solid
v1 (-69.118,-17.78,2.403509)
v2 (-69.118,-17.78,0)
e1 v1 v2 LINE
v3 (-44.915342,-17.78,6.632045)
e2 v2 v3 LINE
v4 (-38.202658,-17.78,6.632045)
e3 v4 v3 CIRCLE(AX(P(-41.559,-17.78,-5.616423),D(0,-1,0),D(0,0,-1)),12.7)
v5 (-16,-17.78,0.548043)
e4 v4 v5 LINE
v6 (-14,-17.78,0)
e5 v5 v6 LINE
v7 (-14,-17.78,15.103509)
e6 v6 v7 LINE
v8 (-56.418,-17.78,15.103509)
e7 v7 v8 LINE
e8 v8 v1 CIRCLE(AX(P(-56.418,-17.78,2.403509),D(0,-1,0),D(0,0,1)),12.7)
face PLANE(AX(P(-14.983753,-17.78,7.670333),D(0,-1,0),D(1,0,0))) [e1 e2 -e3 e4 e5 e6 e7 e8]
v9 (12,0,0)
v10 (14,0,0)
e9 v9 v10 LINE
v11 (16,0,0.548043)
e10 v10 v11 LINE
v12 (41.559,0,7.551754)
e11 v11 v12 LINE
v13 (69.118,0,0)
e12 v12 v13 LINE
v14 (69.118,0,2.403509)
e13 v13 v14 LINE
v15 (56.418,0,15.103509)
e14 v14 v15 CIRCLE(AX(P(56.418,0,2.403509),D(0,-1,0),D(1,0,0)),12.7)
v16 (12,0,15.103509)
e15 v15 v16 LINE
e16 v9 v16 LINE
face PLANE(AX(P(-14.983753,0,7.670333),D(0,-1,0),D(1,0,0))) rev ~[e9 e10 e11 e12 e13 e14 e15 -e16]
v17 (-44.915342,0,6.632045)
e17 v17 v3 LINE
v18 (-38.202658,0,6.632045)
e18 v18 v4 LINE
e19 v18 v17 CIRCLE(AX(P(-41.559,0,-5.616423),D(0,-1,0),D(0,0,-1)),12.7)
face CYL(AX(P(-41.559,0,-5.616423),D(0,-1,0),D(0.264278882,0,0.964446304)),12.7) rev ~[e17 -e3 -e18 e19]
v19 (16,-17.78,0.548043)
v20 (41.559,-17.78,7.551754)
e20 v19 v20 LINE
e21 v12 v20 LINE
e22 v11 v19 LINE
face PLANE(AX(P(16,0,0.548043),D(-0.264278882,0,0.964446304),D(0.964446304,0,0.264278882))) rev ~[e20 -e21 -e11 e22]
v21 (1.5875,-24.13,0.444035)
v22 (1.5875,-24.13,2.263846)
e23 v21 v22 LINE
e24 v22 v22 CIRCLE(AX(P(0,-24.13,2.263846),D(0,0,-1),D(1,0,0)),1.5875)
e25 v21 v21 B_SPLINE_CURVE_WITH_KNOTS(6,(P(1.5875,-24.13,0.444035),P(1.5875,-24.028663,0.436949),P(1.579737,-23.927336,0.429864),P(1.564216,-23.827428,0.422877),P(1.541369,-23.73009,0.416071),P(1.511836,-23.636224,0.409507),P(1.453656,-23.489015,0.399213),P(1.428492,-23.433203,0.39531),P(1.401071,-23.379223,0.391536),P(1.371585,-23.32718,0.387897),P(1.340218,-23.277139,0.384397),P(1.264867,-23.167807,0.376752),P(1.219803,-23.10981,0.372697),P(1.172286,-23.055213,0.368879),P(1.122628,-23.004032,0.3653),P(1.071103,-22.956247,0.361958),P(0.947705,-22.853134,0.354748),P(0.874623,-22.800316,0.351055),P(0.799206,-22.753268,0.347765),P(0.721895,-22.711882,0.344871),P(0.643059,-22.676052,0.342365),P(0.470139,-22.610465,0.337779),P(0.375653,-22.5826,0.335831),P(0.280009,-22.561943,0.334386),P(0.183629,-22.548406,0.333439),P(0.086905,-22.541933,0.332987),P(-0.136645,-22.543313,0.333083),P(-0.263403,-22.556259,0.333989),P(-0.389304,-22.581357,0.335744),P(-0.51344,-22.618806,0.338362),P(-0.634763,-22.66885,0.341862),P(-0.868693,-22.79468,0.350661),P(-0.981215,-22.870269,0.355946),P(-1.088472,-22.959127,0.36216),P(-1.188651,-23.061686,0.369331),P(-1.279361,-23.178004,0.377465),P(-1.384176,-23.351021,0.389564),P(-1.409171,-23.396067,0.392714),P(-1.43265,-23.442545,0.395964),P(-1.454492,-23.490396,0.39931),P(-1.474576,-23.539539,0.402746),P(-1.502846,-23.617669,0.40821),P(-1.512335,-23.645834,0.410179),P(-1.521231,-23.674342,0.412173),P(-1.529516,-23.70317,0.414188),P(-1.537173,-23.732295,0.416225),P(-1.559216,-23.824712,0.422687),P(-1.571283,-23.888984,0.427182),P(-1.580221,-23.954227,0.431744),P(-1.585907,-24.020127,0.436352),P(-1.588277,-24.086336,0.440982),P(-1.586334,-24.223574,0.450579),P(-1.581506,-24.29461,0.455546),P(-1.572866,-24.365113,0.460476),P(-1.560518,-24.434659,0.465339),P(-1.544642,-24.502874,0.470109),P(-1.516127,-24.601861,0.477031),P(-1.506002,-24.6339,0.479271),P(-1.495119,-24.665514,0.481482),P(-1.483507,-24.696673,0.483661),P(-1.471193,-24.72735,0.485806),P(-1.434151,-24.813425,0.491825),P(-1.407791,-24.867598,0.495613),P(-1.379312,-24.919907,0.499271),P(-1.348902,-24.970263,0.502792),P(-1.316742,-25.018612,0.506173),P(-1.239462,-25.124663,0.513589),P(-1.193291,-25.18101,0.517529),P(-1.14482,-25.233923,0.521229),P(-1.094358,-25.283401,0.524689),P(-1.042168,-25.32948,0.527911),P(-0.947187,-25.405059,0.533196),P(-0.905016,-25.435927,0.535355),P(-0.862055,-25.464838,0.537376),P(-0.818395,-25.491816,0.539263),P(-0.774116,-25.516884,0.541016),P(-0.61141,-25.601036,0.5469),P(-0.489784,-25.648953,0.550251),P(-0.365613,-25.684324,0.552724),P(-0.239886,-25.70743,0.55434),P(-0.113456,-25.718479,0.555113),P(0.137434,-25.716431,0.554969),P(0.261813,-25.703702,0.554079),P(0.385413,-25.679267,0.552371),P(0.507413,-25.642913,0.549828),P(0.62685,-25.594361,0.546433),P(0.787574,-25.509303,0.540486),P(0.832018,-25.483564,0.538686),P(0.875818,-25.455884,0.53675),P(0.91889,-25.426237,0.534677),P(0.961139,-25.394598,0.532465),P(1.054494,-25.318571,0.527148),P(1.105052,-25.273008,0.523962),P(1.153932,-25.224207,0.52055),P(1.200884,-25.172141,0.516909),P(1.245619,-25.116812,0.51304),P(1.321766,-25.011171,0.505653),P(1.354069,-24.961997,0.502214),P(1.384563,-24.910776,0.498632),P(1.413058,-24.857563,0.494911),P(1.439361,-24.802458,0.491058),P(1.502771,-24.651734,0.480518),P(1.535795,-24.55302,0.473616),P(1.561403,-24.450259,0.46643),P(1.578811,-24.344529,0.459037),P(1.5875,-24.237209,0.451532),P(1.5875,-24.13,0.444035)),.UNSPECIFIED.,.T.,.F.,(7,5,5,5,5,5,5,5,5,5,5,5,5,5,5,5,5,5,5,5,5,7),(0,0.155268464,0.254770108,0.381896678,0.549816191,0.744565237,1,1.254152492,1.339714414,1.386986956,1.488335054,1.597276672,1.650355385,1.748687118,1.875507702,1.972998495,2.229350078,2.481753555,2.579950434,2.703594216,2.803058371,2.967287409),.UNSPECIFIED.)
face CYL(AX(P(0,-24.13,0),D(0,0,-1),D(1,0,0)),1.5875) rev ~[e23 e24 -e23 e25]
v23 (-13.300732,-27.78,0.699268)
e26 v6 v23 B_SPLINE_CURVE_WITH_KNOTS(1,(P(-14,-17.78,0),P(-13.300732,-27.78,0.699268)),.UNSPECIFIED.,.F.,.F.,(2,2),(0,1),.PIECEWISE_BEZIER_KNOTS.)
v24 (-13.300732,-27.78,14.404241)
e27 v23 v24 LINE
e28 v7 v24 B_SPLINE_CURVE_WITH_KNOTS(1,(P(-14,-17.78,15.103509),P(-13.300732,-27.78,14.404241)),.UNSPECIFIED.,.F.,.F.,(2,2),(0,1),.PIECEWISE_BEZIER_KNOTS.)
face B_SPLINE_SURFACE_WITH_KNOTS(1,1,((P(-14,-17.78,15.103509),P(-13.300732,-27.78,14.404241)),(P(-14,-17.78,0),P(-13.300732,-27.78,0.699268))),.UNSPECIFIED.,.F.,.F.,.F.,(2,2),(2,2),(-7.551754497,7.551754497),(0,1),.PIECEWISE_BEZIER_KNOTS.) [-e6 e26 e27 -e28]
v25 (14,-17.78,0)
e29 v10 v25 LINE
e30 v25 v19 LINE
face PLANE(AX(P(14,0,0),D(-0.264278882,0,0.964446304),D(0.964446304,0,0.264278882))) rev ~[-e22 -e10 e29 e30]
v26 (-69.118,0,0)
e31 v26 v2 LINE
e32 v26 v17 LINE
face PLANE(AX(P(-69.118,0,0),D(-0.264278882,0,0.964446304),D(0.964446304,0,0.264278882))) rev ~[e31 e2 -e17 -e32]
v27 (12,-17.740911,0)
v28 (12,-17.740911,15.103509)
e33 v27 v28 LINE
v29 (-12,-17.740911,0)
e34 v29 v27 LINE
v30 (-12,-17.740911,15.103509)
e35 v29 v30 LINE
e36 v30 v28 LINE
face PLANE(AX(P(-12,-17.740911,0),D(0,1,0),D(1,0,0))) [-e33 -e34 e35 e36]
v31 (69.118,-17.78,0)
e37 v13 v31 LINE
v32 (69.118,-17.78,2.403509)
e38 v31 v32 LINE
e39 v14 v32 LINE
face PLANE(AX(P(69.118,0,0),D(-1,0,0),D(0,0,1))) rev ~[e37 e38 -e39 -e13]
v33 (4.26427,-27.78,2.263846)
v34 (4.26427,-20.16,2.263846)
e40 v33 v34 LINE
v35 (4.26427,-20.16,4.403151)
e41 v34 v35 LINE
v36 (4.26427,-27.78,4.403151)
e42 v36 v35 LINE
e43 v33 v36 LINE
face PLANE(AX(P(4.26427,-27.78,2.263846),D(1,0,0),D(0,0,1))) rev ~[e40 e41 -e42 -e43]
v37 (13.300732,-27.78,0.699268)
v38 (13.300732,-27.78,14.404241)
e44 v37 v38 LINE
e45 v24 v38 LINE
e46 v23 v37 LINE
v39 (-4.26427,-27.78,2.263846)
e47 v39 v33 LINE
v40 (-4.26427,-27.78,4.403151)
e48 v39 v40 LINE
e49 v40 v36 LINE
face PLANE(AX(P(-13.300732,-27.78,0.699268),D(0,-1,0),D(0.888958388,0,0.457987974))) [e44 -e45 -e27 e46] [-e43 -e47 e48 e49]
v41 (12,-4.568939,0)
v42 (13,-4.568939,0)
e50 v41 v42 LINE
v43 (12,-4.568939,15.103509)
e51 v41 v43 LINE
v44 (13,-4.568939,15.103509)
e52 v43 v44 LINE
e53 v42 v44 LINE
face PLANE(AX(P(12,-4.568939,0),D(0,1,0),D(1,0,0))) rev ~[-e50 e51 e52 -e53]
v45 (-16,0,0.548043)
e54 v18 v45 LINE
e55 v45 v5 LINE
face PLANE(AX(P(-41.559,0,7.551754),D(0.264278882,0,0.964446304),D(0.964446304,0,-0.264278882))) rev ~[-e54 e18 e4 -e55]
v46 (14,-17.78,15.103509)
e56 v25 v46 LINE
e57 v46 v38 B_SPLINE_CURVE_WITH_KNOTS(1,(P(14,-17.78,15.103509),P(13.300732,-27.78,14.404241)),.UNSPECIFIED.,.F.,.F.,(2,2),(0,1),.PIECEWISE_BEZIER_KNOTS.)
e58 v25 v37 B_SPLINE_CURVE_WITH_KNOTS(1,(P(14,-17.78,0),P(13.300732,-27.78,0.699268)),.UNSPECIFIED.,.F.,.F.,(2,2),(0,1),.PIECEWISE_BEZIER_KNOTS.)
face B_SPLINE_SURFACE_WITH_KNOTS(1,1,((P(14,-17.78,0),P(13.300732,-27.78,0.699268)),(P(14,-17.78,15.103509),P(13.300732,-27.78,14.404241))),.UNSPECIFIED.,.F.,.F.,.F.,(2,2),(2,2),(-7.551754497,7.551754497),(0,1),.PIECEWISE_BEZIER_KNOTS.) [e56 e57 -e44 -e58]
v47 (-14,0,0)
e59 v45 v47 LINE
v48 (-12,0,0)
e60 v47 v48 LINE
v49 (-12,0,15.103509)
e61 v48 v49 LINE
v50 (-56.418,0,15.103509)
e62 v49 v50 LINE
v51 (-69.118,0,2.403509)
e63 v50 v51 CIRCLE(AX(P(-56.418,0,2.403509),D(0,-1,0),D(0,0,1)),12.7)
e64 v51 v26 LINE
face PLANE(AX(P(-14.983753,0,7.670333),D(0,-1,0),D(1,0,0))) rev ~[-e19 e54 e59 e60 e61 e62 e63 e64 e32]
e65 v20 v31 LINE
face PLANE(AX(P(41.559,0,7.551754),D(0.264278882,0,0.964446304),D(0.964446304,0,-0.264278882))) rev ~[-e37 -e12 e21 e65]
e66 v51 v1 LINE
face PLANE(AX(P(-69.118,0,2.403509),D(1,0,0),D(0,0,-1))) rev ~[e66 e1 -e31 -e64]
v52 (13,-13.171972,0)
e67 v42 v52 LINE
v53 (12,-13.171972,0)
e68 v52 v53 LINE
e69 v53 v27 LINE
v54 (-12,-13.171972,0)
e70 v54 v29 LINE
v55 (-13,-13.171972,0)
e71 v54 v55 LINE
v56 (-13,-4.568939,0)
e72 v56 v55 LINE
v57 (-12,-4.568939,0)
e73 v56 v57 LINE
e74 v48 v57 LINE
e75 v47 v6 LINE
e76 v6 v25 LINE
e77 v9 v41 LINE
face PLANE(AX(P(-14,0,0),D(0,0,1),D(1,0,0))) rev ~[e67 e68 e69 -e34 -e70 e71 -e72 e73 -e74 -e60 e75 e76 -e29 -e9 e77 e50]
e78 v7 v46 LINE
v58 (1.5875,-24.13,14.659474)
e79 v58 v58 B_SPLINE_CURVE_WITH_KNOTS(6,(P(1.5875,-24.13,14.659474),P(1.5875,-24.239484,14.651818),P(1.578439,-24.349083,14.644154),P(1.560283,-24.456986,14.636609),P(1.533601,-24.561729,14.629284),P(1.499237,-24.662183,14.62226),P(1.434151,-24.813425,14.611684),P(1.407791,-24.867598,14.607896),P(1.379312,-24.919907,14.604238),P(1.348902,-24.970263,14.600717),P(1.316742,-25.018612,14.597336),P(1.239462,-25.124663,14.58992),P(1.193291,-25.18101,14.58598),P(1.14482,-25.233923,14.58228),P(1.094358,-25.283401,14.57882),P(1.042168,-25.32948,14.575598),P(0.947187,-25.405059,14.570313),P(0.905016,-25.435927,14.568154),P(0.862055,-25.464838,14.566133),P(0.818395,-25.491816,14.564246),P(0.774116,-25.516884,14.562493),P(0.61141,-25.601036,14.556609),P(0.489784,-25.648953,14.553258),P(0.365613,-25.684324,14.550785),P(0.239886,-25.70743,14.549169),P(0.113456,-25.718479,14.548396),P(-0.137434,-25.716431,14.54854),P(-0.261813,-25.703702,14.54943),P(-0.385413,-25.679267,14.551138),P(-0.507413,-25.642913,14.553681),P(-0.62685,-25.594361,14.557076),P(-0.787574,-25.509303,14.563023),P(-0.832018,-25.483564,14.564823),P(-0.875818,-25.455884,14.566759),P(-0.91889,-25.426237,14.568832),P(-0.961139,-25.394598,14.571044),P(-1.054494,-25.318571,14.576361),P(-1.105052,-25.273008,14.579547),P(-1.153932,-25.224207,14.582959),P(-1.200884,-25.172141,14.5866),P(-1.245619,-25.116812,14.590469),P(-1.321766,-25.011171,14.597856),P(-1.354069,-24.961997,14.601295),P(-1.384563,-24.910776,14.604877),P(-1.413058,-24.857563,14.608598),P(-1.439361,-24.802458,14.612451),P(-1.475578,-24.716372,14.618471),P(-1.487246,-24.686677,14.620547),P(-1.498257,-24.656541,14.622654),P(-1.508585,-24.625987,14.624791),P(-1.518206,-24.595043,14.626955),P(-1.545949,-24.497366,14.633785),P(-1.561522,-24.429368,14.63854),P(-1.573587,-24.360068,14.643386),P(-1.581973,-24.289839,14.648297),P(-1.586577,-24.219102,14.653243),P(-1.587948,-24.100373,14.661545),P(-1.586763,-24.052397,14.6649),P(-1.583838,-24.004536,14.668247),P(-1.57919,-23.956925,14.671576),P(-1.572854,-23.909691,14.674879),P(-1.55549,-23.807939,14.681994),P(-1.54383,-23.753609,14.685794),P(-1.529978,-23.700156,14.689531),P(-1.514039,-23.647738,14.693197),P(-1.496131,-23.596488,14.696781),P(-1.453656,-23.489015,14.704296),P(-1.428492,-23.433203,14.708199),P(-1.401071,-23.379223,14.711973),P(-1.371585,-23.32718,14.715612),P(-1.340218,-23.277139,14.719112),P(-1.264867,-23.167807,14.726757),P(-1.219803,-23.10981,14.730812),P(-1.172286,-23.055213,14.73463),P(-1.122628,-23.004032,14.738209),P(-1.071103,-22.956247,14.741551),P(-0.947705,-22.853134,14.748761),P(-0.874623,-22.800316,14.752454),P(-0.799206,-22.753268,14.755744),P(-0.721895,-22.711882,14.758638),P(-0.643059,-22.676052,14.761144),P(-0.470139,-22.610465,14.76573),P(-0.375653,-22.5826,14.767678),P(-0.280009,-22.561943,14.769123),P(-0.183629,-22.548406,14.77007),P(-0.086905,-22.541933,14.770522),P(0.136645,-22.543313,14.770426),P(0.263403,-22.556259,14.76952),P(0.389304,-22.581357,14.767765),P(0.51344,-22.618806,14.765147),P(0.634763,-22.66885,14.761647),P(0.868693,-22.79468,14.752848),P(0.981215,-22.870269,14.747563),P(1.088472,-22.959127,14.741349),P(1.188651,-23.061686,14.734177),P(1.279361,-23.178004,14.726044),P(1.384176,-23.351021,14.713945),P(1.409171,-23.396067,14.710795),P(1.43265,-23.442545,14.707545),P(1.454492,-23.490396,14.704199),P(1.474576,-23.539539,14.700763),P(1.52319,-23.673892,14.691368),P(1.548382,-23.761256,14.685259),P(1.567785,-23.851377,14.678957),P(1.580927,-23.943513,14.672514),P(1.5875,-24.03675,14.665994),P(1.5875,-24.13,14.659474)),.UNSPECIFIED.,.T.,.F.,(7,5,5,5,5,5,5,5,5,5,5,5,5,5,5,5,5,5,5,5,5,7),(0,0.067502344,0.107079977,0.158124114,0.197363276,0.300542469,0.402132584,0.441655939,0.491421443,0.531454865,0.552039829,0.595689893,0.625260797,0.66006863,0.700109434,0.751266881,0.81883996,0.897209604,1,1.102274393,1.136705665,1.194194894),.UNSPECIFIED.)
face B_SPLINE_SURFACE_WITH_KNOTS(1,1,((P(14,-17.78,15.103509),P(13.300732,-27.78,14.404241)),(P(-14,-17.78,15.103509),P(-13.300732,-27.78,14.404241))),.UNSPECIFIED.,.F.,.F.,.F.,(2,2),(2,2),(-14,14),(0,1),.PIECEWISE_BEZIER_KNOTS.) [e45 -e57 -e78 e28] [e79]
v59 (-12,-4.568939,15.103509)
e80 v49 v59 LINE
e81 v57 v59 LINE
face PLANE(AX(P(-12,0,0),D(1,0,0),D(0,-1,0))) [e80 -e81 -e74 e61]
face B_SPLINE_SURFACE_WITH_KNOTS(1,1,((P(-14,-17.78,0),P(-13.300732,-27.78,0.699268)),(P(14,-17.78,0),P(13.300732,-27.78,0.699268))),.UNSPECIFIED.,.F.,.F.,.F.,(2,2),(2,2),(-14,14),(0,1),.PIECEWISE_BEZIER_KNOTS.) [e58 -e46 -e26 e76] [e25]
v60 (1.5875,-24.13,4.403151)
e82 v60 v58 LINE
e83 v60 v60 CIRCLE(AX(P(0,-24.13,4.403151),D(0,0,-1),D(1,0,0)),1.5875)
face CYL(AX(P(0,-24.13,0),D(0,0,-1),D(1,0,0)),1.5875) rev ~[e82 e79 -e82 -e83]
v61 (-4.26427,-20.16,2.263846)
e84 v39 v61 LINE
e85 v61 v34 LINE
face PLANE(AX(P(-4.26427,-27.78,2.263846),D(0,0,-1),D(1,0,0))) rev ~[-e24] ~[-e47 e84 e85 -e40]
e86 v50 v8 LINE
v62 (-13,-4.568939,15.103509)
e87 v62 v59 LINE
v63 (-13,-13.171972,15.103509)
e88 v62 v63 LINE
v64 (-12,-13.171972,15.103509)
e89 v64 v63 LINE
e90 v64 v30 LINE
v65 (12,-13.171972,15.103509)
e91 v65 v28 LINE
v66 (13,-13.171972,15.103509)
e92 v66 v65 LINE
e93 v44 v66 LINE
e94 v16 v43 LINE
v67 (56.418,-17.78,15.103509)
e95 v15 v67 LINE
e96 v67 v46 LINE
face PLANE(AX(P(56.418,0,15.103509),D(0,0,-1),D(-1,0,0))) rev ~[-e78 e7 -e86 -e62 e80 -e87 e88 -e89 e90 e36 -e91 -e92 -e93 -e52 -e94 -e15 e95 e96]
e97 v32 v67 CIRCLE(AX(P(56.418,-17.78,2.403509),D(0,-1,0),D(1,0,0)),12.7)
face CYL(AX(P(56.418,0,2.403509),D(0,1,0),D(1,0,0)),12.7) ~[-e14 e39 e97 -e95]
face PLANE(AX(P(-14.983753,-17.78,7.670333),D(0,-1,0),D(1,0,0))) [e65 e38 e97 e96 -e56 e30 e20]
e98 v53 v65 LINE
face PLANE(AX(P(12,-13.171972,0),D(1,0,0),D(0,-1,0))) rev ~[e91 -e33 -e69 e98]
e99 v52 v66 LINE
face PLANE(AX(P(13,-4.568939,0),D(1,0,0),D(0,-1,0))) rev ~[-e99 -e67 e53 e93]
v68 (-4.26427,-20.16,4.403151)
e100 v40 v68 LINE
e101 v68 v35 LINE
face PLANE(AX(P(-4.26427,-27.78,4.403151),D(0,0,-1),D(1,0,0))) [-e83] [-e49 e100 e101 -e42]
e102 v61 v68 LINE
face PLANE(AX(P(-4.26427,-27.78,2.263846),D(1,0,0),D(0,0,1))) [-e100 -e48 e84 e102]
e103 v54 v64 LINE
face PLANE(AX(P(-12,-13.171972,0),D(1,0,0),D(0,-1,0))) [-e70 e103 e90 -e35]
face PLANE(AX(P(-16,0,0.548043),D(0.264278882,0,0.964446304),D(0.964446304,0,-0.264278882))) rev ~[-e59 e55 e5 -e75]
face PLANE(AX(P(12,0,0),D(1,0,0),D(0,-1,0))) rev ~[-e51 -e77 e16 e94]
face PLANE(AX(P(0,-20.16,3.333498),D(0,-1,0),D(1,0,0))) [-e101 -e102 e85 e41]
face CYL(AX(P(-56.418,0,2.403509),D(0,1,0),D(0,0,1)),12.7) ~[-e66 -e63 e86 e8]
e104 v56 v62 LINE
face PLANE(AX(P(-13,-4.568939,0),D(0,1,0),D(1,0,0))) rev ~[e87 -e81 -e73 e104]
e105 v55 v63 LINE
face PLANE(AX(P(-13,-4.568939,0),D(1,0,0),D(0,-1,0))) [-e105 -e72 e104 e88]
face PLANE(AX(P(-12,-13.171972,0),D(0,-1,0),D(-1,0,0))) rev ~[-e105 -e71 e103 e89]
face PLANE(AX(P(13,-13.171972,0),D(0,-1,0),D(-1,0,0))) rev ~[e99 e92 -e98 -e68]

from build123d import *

# Parameters (mm, degrees)
F0_W     = 14
F0_H     = 15.1035089948
F1_DEPTH = 17.78
F2_W     = 28
F2_H     = 15.1035089948
F3_DEPTH = 10
F3_TAPER = 4
F4_R     = 12.7
F5_W     = 1
F5_H     = 8.6030326784
F5_W_2   = 24
F5_H_2   = 4.5689390972
F5_R     = 1.5875
F6_DEPTH = 15.1045090948
F7_W     = 8.5285408422
F7_H     = 2.1393047646
F8_DEPTH = 7.62


# Not quite as in the source:
# - a feature names something its author has since deleted; it is built from what else it names


with BuildPart() as f1:
    # F0 (on Front) → F1 (new body)
    with BuildSketch(Plane.XZ):
        Polygon((-16, 0.5480427082), (-14, 0), (-14, 15.1035089948), (-16, 15.1035089948), align=None)
        with BuildLine():
            Line((-41.559, 7.5517544974), (-16, 0.5480427082))
            Line((-16, 0.5480427082), (-16, 15.1035089948))
            Line((-16, 15.1035089948), (-56.418, 15.1035089948))
            ThreePointArc((-56.418, 15.1035089948), (-65.3982561211, 11.3837651159), (-69.118, 2.4035089948))
            Line((-69.118, 2.4035089948), (-69.118, 0))
            Line((-69.118, 0), (-41.559, 7.5517544974))
        make_face()
        with Locations((-7, 7.5517544974)):
            Rectangle(F0_W, F0_H)
        with Locations((7, 7.5517544974)):
            Rectangle(F0_W, F0_H)
        with BuildLine():
            Line((16, 15.1035089948), (16, 0.5480427082))
            Line((16, 0.5480427082), (41.559, 7.5517544974))
            Line((41.559, 7.5517544974), (69.118, 0))
            Line((69.118, 0), (69.118, 2.4035089948))
            ThreePointArc((69.118, 2.4035089948), (65.3982561211, 11.3837651159), (56.418, 15.1035089948))
            Line((56.418, 15.1035089948), (16, 15.1035089948))
        make_face()
        Polygon((14, 15.1035089948), (14, 0), (16, 0.5480427082), (16, 15.1035089948), align=None)
    extrude(amount=F1_DEPTH)

    # F2 (on face) → F3 (join)
    with BuildSketch(Plane.XZ.offset(17.78)):
        with Locations((0, 7.5517544974)):
            Rectangle(F2_W, F2_H)
    extrude(amount=F3_DEPTH, taper=F3_TAPER)

    # F4
    f4_edges = [f1.edges().sort_by_distance(p)[0] for p in [
        (-41.559, -8.89, 7.551754),
    ]]
    fillet(f4_edges, radius=F4_R)

    # F5 (on face) → F6 (cut, through all)
    with BuildSketch(Plane(origin=(0, 0, 0), x_dir=(1, 0, 0), z_dir=(0, 0, -1))):
        with Locations((-12.5, 8.8704554364)):
            Rectangle(F5_W, F5_H)
        with Locations((0, 8.8704554364)):
            Rectangle(F5_W_2, F5_H)
        with Locations((0, 2.2844695486)):
            Rectangle(F5_W_2, F5_H_2)
        with Locations((12.5, 8.8704554364)):
            Rectangle(F5_W, F5_H)
        with Locations((0, 15.4564413242)):
            Rectangle(F5_W_2, F5_H_2)
        with Locations((0, 24.13)):
            Circle(F5_R)
    extrude(amount=-F6_DEPTH, mode=Mode.SUBTRACT)

    # F7 (on face) → F8 (cut)
    with BuildSketch(Plane.XZ.offset(27.78)):
        with Locations((0, 3.333498491)):
            Rectangle(F7_W, F7_H)
    extrude(amount=-F8_DEPTH, mode=Mode.SUBTRACT)


solid = f1.part
